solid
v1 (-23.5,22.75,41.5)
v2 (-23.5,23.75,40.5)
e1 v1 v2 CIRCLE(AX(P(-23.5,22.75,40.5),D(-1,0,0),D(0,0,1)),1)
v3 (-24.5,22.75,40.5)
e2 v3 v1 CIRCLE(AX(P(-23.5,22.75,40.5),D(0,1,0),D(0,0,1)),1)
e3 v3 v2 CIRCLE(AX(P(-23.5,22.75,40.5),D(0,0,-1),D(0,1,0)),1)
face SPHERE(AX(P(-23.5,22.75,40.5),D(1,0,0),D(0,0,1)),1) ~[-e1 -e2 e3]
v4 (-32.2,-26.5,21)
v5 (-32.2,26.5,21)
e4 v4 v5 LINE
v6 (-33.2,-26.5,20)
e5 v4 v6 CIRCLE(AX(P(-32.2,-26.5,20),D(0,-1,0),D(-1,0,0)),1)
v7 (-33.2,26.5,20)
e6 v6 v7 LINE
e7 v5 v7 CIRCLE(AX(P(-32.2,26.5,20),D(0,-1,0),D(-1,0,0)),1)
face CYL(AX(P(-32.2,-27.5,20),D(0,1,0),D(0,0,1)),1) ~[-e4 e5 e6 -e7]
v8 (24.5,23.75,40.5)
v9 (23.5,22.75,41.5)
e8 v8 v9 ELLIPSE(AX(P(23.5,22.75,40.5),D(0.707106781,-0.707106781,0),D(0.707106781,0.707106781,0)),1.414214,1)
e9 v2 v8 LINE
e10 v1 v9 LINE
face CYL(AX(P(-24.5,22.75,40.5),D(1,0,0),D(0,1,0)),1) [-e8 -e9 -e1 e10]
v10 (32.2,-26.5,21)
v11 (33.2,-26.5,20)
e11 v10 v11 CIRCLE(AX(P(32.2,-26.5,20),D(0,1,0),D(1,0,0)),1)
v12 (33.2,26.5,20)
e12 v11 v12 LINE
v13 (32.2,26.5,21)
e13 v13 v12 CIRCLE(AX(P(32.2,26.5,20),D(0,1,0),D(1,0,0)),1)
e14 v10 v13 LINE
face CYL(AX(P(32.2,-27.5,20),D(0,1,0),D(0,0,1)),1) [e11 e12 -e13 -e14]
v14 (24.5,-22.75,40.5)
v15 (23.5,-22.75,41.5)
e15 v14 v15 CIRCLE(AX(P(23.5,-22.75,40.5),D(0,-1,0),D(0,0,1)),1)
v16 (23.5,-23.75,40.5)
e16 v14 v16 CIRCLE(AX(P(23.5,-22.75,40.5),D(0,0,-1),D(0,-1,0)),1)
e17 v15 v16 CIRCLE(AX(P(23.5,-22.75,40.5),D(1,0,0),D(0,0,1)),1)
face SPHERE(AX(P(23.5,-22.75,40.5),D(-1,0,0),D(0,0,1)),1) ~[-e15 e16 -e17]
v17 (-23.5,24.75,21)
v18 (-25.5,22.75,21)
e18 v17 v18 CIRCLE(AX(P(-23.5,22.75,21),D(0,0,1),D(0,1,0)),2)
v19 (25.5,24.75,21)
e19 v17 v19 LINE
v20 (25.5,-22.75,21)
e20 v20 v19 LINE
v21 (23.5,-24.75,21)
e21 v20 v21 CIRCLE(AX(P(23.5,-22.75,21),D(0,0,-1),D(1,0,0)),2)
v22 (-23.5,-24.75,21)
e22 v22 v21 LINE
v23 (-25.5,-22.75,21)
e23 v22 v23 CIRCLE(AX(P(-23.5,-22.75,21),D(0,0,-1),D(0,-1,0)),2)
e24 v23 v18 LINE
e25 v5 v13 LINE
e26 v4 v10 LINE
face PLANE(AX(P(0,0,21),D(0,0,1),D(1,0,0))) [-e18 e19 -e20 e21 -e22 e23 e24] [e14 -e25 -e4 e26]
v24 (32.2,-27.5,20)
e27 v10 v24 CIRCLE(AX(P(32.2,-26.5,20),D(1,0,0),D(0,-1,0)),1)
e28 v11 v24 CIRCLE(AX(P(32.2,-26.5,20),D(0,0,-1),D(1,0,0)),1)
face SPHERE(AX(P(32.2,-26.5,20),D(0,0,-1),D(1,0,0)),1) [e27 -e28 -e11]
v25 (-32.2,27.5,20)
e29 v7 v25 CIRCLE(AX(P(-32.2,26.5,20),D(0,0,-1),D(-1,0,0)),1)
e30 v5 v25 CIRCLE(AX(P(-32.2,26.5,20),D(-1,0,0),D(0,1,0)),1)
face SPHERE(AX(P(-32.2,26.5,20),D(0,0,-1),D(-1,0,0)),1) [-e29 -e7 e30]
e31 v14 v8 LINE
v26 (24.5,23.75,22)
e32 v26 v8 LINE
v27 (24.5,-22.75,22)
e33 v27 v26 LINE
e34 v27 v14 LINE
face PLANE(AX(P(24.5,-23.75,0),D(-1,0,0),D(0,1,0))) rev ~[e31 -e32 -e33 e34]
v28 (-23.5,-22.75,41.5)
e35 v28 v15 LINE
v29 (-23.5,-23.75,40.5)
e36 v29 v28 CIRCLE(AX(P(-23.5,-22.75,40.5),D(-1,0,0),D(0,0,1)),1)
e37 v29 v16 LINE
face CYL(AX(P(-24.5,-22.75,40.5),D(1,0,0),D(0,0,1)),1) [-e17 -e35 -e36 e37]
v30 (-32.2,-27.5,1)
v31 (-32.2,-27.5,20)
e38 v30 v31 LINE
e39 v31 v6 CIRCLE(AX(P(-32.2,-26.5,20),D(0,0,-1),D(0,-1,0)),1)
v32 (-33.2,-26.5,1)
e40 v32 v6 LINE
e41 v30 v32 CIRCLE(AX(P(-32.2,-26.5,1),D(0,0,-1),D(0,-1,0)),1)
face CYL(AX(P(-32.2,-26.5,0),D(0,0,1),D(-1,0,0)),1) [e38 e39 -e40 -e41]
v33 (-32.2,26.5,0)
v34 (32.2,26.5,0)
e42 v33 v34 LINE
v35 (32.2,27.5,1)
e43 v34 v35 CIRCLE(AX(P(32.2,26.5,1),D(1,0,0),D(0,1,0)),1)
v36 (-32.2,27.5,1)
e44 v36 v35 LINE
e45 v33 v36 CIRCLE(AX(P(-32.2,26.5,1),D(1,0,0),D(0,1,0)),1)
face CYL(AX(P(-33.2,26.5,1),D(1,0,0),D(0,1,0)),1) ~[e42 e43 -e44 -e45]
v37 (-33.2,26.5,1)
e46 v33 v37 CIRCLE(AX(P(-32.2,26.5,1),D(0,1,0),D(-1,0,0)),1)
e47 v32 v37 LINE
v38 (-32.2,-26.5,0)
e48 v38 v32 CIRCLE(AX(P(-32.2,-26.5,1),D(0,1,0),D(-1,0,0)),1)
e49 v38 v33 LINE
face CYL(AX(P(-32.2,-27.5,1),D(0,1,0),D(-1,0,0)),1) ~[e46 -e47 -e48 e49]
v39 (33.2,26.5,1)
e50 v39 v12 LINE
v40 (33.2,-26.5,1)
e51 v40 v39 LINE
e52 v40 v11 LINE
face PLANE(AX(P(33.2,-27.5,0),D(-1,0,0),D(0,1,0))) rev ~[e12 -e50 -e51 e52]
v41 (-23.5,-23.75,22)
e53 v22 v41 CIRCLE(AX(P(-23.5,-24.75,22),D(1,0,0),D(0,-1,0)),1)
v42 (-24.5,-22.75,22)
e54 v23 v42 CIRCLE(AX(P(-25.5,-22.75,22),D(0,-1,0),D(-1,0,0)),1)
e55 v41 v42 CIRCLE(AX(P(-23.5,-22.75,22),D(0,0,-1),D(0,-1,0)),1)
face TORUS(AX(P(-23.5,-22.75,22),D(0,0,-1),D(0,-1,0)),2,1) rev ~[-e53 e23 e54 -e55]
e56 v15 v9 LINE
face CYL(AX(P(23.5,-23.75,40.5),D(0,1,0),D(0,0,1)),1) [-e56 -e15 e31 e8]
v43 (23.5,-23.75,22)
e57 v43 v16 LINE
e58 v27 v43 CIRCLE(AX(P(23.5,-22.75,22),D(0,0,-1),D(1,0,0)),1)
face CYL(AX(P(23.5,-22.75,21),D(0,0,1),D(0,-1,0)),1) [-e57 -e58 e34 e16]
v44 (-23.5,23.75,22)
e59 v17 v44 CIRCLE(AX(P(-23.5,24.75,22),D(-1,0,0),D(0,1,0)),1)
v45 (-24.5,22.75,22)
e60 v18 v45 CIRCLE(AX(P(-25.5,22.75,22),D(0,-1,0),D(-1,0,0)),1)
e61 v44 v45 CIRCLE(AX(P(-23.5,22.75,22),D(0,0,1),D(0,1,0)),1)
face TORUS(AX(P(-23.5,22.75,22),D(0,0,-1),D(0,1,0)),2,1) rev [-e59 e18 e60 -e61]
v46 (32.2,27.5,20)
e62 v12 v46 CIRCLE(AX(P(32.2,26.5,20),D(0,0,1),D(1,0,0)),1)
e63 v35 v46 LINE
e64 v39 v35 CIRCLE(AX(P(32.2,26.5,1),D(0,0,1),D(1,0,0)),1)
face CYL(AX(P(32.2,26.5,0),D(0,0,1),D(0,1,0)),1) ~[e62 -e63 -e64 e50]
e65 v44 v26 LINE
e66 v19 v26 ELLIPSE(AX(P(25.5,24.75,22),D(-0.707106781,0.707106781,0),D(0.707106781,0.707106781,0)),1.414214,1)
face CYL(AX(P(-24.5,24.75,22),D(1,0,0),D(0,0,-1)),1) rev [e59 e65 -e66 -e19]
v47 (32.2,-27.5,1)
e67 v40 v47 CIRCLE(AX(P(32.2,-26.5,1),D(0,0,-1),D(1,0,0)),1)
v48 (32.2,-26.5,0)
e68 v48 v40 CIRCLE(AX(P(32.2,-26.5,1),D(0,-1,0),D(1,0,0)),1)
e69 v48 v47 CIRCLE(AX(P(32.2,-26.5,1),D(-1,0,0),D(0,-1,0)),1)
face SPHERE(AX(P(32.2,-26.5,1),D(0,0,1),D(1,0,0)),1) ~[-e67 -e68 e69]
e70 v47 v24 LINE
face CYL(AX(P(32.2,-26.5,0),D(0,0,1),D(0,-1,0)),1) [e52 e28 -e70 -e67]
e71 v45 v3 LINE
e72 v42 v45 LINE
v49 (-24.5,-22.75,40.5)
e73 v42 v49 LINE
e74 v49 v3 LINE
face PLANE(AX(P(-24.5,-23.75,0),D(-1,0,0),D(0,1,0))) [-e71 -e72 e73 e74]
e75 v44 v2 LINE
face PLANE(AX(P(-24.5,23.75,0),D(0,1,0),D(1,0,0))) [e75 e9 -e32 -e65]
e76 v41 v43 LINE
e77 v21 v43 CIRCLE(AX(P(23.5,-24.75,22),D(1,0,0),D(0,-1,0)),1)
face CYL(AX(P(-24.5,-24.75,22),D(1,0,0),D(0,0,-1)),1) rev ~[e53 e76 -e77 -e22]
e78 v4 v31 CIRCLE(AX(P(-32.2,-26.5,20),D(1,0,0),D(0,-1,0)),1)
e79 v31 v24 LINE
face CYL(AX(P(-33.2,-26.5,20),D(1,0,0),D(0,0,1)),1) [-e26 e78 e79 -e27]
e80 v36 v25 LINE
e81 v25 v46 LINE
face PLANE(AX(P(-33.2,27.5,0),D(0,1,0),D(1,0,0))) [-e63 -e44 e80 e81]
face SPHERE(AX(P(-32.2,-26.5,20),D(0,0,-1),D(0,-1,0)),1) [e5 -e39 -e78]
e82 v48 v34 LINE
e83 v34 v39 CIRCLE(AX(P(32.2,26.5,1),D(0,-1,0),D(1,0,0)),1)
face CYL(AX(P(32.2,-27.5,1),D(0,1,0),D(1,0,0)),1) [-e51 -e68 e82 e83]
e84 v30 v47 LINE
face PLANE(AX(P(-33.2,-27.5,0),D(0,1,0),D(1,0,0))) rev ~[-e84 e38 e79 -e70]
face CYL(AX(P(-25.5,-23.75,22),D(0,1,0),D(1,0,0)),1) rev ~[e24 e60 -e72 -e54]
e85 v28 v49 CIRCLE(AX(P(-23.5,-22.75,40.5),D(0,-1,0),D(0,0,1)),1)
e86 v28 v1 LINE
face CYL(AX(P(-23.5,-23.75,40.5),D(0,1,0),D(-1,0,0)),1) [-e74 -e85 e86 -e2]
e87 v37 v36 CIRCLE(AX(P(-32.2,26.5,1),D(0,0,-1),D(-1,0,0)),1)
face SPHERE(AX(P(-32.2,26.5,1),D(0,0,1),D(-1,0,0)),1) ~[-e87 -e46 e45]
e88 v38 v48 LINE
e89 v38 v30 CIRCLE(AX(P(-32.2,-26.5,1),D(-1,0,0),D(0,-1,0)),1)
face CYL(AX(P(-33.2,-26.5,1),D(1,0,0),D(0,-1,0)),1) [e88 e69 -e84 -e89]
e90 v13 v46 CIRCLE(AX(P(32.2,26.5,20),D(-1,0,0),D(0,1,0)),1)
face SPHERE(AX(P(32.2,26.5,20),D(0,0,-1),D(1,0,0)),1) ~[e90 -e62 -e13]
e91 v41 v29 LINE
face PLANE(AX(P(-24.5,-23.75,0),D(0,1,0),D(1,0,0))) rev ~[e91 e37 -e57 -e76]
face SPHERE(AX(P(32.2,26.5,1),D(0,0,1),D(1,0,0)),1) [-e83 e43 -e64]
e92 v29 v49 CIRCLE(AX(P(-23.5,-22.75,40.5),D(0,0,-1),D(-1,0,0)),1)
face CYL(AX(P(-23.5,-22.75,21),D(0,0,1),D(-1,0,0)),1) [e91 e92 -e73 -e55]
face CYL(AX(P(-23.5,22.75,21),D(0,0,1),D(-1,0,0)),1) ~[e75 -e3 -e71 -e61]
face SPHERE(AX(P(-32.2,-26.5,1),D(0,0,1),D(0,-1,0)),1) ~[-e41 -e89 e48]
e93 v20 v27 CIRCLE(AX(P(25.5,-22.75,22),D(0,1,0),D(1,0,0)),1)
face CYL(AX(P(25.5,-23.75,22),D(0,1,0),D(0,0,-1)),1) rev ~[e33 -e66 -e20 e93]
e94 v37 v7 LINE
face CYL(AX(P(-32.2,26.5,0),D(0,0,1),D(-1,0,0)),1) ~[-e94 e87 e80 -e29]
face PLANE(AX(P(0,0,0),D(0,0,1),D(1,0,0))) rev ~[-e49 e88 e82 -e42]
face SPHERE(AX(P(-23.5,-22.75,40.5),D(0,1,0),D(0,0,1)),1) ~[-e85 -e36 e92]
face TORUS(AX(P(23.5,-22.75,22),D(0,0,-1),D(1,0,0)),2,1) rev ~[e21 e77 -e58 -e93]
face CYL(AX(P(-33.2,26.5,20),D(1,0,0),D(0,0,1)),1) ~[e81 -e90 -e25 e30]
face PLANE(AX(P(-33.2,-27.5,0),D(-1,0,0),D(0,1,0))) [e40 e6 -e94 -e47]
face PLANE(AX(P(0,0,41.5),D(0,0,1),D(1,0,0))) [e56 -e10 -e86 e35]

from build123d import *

# Parameters (mm, degrees)
F0_W     = 66.4
F0_H     = 55
F0_W_2   = 49
F0_H_2   = 47.5
F1_DEPTH = 21
F2_DEPTH = 41.5
F3_R     = 1


with BuildPart() as f1:
    # F0 (on Top) → F1 (new body)
    with BuildSketch(Plane.XY):
        Rectangle(F0_W, F0_H)
        Rectangle(F0_W_2, F0_H_2, mode=Mode.SUBTRACT)
    extrude(amount=F1_DEPTH)

    # F0 (on Top) → F2 (join)
    with BuildSketch(Plane.XY):
        Rectangle(F0_W_2, F0_H_2)
    extrude(amount=F2_DEPTH)

    # F3
    f3_edges = [f1.edges().sort_by_distance(p)[0] for p in [
        (0, 23.75, 41.5),
        (-24.5, 0, 41.5),
        (0, -23.75, 41.5),
        (24.5, 0, 41.5),
        (-24.5, 0, 21),
        (-24.5, -23.75, 31.25),
        (-24.5, 23.75, 31.25),
        (0, -23.75, 21),
        (24.5, -23.75, 31.25),
        (33.2, -27.5, 10.5),
        (33.2, 27.5, 10.5),
        (33.2, 0, 0),
        (33.2, 0, 21),
        (-33.2, -27.5, 10.5),
        (0, -27.5, 0),
        (0, -27.5, 21),
        (-33.2, 27.5, 10.5),
        (-33.2, 0, 0),
        (-33.2, 0, 21),
        (0, 27.5, 0),
        (0, 27.5, 21),
        (24.5, 0, 21),
        (0, 23.75, 21),
    ]]
    fillet(f3_edges, radius=F3_R)


solid = f1.part
